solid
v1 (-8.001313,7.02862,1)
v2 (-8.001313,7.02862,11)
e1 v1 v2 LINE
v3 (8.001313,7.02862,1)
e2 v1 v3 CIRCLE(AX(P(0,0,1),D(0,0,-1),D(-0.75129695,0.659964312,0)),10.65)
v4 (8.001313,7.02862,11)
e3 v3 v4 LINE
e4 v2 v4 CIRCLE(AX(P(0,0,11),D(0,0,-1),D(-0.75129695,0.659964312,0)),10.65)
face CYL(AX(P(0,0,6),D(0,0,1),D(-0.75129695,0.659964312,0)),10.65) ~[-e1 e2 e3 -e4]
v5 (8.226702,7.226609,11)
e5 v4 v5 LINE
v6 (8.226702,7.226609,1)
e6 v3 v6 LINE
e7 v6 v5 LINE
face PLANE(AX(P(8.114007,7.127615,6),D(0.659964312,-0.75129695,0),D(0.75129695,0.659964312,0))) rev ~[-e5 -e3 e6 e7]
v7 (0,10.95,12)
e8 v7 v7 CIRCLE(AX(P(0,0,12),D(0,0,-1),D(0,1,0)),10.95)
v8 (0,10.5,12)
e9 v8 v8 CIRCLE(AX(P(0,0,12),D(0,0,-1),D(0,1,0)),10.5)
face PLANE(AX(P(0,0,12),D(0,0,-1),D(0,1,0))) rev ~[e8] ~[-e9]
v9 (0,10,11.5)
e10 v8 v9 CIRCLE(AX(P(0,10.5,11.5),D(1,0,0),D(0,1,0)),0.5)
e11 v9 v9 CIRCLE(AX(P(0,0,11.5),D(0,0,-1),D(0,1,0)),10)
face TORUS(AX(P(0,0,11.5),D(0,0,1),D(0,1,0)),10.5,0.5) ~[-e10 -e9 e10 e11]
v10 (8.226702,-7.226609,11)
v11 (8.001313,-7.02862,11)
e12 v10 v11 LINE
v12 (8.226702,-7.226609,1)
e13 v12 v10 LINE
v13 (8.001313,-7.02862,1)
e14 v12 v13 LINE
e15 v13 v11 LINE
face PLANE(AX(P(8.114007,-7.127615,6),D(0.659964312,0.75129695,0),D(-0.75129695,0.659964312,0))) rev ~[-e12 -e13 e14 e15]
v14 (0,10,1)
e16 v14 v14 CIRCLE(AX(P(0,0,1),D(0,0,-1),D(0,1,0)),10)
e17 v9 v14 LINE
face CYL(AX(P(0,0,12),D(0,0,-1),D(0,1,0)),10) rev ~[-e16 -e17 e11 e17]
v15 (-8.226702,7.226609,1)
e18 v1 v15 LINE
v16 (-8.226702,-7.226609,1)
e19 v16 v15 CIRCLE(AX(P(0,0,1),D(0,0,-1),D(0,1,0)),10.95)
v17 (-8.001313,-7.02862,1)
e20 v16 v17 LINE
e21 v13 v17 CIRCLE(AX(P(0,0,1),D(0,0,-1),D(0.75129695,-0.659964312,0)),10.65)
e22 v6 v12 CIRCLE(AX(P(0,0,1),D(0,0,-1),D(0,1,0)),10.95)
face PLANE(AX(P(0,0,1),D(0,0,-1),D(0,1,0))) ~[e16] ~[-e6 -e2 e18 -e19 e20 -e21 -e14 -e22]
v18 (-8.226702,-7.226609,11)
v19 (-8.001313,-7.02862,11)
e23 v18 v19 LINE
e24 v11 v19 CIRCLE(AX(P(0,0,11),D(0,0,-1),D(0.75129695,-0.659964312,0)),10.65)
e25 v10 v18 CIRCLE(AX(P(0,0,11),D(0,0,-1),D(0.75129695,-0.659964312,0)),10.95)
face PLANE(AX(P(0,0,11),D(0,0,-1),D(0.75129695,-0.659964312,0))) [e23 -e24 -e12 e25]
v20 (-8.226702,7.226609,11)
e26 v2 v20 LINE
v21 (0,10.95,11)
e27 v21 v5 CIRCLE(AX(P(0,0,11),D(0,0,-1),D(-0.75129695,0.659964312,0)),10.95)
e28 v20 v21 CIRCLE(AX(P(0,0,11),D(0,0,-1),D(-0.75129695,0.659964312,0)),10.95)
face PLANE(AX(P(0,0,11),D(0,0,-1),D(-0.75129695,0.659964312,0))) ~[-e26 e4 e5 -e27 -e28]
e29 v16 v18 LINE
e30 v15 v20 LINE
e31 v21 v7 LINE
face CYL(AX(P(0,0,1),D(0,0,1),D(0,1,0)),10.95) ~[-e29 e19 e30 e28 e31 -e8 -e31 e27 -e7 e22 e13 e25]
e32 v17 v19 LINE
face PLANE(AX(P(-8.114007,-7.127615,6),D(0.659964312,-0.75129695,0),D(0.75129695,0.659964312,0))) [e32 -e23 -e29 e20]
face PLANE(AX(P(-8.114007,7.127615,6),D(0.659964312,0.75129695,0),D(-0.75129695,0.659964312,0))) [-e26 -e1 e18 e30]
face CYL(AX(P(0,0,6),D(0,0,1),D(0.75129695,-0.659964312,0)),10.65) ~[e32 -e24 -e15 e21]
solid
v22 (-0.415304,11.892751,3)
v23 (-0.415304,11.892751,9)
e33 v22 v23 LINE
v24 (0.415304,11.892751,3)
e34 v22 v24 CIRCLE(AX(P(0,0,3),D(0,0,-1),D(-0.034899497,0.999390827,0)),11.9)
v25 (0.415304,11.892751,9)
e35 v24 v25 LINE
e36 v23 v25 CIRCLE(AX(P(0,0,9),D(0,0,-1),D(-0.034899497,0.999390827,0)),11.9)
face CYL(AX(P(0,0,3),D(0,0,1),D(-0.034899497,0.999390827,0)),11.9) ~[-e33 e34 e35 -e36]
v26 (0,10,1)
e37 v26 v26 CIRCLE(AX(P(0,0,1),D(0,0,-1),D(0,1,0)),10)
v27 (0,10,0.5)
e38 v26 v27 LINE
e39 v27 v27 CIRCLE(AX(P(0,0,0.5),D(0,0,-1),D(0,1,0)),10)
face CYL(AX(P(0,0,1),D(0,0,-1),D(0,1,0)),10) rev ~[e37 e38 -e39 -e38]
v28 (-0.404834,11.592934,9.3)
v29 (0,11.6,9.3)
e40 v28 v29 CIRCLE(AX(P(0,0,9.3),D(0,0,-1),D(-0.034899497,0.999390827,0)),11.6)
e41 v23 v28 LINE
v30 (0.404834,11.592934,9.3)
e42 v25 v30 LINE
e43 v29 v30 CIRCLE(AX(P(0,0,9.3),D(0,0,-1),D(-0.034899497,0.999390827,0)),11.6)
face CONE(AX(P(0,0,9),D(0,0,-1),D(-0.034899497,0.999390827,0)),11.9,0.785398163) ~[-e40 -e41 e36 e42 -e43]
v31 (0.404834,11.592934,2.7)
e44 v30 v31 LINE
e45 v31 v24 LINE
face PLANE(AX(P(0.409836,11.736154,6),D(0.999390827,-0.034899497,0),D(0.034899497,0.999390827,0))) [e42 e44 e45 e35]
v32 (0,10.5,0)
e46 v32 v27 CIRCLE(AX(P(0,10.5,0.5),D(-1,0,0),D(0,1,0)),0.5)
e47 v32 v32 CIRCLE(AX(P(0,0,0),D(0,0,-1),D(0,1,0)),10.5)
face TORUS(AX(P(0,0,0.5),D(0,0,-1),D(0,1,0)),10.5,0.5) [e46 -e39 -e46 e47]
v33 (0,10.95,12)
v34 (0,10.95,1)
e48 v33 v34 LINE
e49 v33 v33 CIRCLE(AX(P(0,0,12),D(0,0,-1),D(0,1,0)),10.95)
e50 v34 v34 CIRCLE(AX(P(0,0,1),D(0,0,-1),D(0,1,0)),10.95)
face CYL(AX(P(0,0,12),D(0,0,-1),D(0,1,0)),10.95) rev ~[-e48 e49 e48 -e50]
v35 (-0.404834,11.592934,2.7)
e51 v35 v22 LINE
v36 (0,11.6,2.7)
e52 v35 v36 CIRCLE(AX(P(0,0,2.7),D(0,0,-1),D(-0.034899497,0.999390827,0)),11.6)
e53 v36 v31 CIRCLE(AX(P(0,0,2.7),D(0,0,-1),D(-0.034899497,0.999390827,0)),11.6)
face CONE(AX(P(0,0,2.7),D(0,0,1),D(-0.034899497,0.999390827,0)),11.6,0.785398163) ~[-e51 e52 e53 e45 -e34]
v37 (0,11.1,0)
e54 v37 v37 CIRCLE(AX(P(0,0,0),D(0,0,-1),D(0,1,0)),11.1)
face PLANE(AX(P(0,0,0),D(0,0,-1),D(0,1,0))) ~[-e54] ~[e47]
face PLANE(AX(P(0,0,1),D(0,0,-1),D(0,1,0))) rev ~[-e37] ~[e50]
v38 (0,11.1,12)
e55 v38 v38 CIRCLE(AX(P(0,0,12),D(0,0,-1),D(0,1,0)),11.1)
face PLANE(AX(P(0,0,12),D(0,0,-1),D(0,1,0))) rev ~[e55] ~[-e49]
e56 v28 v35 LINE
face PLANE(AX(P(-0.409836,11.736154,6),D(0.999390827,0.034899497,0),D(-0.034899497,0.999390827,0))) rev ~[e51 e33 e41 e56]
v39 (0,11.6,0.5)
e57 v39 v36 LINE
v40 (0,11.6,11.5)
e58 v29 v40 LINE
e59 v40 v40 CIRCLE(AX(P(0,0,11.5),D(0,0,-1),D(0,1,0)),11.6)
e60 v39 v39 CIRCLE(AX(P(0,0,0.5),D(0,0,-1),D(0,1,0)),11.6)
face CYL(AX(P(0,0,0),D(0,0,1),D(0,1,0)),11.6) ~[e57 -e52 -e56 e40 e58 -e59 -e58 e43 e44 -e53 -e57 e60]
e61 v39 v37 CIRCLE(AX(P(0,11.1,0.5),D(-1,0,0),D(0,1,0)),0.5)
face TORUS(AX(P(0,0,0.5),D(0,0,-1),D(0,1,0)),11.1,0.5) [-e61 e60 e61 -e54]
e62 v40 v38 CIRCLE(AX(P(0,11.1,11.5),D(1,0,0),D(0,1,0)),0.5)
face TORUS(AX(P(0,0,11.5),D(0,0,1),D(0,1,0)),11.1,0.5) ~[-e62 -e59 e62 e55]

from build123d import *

# Parameters (mm, degrees)
F2_W          = 0.3
F2_H          = 10
F5_ANGLE_BACK = 48.7028489575
F5_ANGLE      = 97.405697915
F6_ANGLE_BACK = 2
F6_ANGLE      = 4
F7_R          = 0.5
F7_2_R        = 0.5


with BuildPart() as f3:
    # F2 (on Right) → F3 (revolve)
    with BuildSketch(Plane.YZ):
        Polygon((10.95, 12), (10.95, 11), (10.95, 1), (10.65, 1), (10, 1), (10, 0), (11.6, 0), (11.6, 2.7), (11.6, 9.3), (11.6, 12), align=None)
    revolve(axis=Axis((0, 0, 13.9442766085), (0, 0, -1)))

    # F2 (on Right) → F6 (revolve)
    with BuildSketch(Plane.YZ, mode=Mode.PRIVATE) as f6_sk:
        Polygon((11.9, 9), (11.6, 9.3), (11.6, 2.7), (11.9, 3), align=None)
    revolve(f6_sk.sketch.rotate(Axis((0, 0, 13.9442766085), (0, 0, -1)), -F6_ANGLE_BACK), axis=Axis((0, 0, 13.9442766085), (0, 0, -1)), revolution_arc=F6_ANGLE)

    # F7
    f7_edges = [f3.edges().sort_by_distance(p)[0] for p in [
        (0, -11.6, 12),
        (0, -10, 0),
        (0, -11.6, 0),
    ]]
    fillet(f7_edges, radius=F7_R)


with BuildPart() as f4:
    # F2 (on Right) → F4 (revolve)
    with BuildSketch(Plane.YZ):
        Polygon((10.65, 1), (10.65, 11), (10.95, 11), (10.95, 12), (10, 12), (10, 1), align=None)
        with Locations((10.8, 6)):
            Rectangle(F2_W, F2_H)
    revolve(axis=Axis((0, 0, 13.9442766085), (0, 0, -1)))

    # F2 (on Right) → F5 (revolve, cut)
    with BuildSketch(Plane.YZ, mode=Mode.PRIVATE) as f5_sk:
        with Locations((10.8, 6)):
            Rectangle(F2_W, F2_H)
        with Locations((-10.8, 6)):
            Rectangle(F2_W, F2_H)
    revolve(f5_sk.sketch.rotate(Axis((0, 0, 13.9442766085), (0, 0, -1)), -F5_ANGLE_BACK), axis=Axis((0, 0, 13.9442766085), (0, 0, -1)), revolution_arc=F5_ANGLE, mode=Mode.SUBTRACT)

    # F7#2
    f7_2_edges = [f4.edges().sort_by_distance(p)[0] for p in [
        (0, -10, 12),
    ]]
    fillet(f7_2_edges, radius=F7_2_R)


solid = Compound([f3.part, f4.part])
